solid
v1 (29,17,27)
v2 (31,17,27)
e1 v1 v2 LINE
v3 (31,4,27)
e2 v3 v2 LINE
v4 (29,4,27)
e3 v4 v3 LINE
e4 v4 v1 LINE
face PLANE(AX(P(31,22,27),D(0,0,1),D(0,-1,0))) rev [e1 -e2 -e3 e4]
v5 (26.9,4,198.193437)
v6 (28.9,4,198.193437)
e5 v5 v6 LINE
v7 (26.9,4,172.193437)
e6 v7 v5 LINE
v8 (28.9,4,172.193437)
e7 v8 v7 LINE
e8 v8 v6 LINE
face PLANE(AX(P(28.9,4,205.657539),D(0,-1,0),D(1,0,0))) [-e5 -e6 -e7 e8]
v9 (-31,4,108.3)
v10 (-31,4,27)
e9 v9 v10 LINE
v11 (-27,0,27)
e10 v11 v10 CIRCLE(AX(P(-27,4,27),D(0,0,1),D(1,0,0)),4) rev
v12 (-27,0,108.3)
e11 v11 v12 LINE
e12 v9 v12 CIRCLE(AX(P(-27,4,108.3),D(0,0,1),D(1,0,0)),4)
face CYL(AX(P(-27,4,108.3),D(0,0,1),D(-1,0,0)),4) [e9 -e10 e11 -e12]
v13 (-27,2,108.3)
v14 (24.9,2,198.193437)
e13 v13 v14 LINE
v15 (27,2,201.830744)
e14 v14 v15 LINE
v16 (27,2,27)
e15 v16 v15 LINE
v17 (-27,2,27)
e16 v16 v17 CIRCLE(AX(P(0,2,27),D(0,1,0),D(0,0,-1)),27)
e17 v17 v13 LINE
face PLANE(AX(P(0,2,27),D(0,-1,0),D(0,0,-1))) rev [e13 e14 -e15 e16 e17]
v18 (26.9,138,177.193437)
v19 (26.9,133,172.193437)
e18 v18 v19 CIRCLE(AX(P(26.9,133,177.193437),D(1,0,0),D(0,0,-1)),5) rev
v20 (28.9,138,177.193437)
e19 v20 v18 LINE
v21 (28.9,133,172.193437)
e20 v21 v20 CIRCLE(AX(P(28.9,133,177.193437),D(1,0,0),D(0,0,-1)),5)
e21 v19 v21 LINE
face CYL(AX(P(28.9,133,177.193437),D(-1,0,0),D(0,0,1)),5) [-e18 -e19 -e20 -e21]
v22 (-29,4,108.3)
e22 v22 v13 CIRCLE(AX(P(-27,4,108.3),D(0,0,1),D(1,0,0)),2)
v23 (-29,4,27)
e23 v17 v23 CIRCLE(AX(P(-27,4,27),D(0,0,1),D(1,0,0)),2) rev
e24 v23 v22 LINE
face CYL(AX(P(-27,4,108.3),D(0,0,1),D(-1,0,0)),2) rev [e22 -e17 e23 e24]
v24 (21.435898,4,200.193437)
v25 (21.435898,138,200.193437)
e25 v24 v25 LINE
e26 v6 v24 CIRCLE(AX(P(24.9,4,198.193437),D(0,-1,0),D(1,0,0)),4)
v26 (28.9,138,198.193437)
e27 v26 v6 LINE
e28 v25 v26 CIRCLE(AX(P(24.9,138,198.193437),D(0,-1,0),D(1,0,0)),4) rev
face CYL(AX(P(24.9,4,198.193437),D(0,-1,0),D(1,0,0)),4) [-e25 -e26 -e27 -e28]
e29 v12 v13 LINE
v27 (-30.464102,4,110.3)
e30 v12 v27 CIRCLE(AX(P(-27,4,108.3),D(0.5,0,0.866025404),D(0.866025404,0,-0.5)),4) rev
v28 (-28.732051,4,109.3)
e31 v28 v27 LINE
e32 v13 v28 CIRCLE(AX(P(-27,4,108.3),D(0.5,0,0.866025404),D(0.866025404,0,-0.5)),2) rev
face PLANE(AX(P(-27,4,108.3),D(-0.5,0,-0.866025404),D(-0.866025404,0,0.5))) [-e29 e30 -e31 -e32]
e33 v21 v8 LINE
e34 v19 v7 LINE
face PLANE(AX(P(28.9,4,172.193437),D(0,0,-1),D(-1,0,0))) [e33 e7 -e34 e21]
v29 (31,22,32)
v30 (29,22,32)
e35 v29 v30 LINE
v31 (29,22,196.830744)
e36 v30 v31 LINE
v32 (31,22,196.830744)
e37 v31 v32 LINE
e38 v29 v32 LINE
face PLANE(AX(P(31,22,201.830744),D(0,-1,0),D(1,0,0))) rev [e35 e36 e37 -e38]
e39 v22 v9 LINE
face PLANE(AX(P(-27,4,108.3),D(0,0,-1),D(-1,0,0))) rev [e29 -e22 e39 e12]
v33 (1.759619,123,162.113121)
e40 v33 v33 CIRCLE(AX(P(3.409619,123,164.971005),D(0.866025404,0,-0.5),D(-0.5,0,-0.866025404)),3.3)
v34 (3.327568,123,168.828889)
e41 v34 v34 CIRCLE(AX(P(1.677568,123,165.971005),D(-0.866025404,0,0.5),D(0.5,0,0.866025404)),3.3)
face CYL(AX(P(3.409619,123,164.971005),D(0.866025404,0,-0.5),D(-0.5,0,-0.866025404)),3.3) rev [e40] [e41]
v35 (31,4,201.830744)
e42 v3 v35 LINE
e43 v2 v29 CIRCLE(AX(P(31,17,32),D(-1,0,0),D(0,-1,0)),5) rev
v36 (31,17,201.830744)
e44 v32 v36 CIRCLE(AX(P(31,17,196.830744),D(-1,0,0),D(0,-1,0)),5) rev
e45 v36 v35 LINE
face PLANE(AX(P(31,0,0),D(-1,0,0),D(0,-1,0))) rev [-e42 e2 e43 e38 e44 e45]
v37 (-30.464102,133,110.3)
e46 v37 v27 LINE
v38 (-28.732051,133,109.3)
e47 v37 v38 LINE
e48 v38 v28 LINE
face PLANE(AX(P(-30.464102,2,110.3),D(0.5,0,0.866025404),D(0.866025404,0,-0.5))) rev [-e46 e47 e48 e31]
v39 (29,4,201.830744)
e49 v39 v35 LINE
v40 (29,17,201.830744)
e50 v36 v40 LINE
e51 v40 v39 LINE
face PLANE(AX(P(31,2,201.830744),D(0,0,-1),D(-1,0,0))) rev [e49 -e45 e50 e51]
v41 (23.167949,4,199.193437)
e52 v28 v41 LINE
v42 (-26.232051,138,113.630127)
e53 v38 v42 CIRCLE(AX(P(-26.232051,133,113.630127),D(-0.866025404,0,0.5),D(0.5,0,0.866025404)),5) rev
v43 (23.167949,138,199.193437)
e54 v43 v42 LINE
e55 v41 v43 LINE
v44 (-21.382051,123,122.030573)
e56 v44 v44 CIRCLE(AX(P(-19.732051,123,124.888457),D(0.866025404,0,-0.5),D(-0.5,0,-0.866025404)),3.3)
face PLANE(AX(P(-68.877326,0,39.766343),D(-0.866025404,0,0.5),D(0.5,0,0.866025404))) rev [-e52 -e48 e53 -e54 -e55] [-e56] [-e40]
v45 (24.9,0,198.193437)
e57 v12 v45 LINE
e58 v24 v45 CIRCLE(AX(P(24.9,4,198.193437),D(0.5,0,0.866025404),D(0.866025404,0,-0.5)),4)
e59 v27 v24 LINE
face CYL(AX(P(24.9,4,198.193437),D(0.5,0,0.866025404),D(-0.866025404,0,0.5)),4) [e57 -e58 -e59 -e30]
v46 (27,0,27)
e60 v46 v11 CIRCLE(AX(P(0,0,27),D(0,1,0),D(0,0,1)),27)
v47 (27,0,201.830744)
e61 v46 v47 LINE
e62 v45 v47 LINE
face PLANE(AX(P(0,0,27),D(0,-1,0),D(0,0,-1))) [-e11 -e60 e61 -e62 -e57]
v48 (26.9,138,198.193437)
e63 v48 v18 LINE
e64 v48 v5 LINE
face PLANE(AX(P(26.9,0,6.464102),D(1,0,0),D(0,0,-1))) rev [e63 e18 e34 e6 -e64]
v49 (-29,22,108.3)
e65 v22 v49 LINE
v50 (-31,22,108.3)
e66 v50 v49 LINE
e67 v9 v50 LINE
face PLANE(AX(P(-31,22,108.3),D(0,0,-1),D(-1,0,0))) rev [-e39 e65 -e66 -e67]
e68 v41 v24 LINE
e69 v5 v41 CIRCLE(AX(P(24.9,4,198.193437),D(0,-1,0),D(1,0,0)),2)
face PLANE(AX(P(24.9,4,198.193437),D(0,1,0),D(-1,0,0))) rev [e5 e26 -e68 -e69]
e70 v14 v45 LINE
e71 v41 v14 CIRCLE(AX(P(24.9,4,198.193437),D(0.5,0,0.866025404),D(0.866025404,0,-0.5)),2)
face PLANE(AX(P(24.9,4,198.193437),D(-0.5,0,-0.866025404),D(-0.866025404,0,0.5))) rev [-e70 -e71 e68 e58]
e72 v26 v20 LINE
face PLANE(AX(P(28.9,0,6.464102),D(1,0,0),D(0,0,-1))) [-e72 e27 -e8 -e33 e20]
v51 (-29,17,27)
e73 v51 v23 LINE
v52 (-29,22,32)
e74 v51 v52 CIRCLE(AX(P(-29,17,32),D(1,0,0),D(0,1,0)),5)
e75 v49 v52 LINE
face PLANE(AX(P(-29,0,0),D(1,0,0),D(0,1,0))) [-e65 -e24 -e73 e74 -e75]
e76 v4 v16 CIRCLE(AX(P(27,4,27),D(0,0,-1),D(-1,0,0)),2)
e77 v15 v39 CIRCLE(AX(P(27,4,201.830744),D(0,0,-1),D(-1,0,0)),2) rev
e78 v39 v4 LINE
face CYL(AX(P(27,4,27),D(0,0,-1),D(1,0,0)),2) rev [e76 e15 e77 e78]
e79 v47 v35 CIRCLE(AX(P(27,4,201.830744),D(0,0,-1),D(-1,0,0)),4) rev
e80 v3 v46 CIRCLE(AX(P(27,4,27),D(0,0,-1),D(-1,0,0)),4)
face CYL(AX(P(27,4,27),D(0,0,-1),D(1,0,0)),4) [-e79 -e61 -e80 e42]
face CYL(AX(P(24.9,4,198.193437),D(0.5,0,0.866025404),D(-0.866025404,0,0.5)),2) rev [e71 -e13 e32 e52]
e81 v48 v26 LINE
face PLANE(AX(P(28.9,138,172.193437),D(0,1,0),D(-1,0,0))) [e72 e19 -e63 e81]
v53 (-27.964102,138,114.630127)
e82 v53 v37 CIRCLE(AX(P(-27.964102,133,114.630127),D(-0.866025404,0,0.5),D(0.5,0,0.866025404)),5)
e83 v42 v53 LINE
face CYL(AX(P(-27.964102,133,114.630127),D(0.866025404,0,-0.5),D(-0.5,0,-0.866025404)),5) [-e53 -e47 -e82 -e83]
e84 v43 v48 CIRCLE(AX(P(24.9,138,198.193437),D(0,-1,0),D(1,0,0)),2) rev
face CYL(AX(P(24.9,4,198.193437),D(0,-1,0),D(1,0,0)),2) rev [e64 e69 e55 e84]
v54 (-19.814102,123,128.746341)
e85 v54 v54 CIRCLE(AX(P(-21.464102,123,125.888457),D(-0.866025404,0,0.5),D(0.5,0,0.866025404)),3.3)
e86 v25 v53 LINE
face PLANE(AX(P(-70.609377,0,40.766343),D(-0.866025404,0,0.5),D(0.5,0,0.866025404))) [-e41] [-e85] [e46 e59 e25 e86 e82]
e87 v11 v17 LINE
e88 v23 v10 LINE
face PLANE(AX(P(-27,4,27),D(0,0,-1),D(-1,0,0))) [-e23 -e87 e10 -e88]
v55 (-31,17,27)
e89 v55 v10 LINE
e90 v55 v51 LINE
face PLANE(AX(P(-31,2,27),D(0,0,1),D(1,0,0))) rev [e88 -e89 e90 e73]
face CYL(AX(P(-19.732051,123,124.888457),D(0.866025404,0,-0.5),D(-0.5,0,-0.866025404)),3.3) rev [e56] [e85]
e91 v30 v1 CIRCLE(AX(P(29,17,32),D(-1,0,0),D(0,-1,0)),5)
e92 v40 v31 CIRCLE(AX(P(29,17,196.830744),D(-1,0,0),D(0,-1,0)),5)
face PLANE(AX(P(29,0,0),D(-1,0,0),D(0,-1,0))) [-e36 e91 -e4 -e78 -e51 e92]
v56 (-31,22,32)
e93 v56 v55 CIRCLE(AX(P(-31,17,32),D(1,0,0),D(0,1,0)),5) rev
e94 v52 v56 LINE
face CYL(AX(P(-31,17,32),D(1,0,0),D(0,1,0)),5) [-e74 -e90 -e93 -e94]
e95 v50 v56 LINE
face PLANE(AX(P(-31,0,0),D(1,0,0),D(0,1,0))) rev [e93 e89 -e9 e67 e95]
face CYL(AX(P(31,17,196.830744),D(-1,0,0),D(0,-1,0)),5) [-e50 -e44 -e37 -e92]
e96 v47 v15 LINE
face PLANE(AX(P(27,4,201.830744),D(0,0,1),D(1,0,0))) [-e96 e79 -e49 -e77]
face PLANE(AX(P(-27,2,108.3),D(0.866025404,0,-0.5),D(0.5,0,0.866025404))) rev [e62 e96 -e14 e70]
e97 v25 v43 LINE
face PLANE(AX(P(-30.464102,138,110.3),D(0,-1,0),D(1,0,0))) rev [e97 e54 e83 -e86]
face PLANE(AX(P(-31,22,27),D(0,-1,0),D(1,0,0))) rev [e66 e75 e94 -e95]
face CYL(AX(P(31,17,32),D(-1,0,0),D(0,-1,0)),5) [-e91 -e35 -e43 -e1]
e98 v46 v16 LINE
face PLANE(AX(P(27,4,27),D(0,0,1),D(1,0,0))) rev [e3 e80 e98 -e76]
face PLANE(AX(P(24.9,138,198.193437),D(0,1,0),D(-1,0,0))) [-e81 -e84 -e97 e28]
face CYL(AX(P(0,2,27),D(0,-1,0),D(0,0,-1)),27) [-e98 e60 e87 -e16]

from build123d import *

# Parameters (mm, degrees)
BOSS_EXTRUDE1_DEPTH     = 2
BOSS_EXTRUDE3_DEPTH     = 2
EDGE_FLANGE1_DEPTH      = 81.3
EDGE_FLANGE1_BEND_DEPTH = 174.830743609
EDGE_FLANGE2_DEPTH      = 103.8
EDGE_FLANGE3_DEPTH      = 134
M6_CLEARANCE_HOLE1_D    = 6.6
FILLET1_R               = 5


# Sheet-metal steps are written as plain solids
with BuildPart() as part:
    # Sketch1 → Boss-Extrude1 (new body)
    with BuildSketch(Plane(origin=(0, 0, 0), x_dir=(1, 0, 0), z_dir=(0, 1, 0))):
        with BuildLine():
            Line((-27, -108.3), (-27, -27))
            ThreePointArc((-27, -27), (-19.091883092, -7.908116908), (0, 0))
            Line((0, 0), (0, -108.3))
            Line((0, -108.3), (-27, -108.3))
        make_face()
    boss_extrude1 = extrude(amount=BOSS_EXTRUDE1_DEPTH)

    # Mirror1: Boss-Extrude1 across plane
    add(boss_extrude1.mirror(Plane(origin=(0, 0, 0), x_dir=(0, 0, 1), z_dir=(1, 0, 0))))

    # Sketch15 → Boss-Extrude3 (add)
    with BuildSketch(Plane(origin=(0, 2, 0), x_dir=(1, 0, 0), z_dir=(0, 1, 0))):
        Polygon((-27, -108.3), (27, -201.830743609), (27, -108.3), align=None)
    extrude(amount=-BOSS_EXTRUDE3_DEPTH)

    # Edge-Flange1 section (across the edge) → Edge-Flange1 (add)
    with BuildSketch(Plane(origin=(-29, 2, 27), x_dir=(1, 0, 0), z_dir=(0, 0, 1))):
        with BuildLine():
            Line((-2, 2), (-2, 20))
            Line((-2, 20), (0, 20))
            Line((0, 20), (0, 2))
            ThreePointArc((0, 2), (0.585786438, 0.585786438), (2, 0))
            Line((2, 0), (2, -2))
            ThreePointArc((2, -2), (-0.828427125, -0.828427125), (-2, 2))
        make_face()
    extrude(amount=EDGE_FLANGE1_DEPTH)

    # Edge-Flange1 section 2 (across the edge) → Edge-Flange1 bend (add)
    with BuildSketch(Plane(origin=(29, 2, 201.830743609), x_dir=(-1, 0, 0), z_dir=(0, 0, -1))):
        with BuildLine():
            Line((-2, 2), (-2, 20))
            Line((-2, 20), (0, 20))
            Line((0, 20), (0, 2))
            ThreePointArc((0, 2), (0.585786438, 0.585786438), (2, 0))
            Line((2, 0), (2, -2))
            ThreePointArc((2, -2), (-0.828427125, -0.828427125), (-2, 2))
        make_face()
    extrude(amount=EDGE_FLANGE1_BEND_DEPTH)

    # Edge-Flange2 section (across the edge) → Edge-Flange2 (add)
    with BuildSketch(Plane(origin=(-28.732050808, 2, 109.3), x_dir=(0.8660254037844362, 3.491481338843134e-15, -0.5000000000000044), z_dir=(0.5000000000000044, 0, 0.8660254037844362))):
        with BuildLine():
            Line((-2, 2), (-2, 136))
            Line((-2, 136), (0, 136))
            Line((0, 136), (0, 2))
            ThreePointArc((0, 2), (0.585786438, 0.585786438), (2, 0))
            Line((2, 0), (2, -2))
            ThreePointArc((2, -2), (-0.828427125, -0.828427125), (-2, 2))
        make_face()
    extrude(amount=EDGE_FLANGE2_DEPTH)

    # Edge-Flange3 section (across the edge) → Edge-Flange3 (add)
    with BuildSketch(Plane(origin=(26.9, 138, 205.657538528), x_dir=(-1, 0, 0), z_dir=(0, -1, 0))):
        with BuildLine():
            Line((-2, 7.464101615), (-2, 33.464101615))
            Line((-2, 33.464101615), (0, 33.464101615))
            Line((0, 33.464101615), (0, 7.464101615))
            ThreePointArc((0, 7.464101615), (1.48236191, 5.532249963), (3.732050808, 6.464101615))
            Line((3.732050808, 6.464101615), (5.464101615, 5.464101615))
            ThreePointArc((5.464101615, 5.464101615), (0.96472382, 3.60039831), (-2, 7.464101615))
        make_face()
    extrude(amount=EDGE_FLANGE3_DEPTH)

    # M6 Clearance Hole1 (through all)
    with Locations(Plane(origin=(-68.877326422, 0, 39.766342951), x_dir=(-0.5000000000000046, -2.00195274507357e-15, -0.8660254037844362), z_dir=(0.8660254037844362, 3.4674838688193673e-15, -0.5000000000000046))):
        with Locations((-144.573890731, 123), (-98.29055123, 123)):
            Hole(M6_CLEARANCE_HOLE1_D / 2)

    # Fillet1
    fillet1_edges = [part.edges().sort_by_distance(p)[0] for p in [
        (-30, 22, 27),
        (30, 22, 201.830743609),
        (30, 22, 27),
        (-29.598076211, 138, 109.8),
        (27.9, 138, 172.193436913),
    ]]
    fillet(fillet1_edges, radius=FILLET1_R)


solid = part.part
